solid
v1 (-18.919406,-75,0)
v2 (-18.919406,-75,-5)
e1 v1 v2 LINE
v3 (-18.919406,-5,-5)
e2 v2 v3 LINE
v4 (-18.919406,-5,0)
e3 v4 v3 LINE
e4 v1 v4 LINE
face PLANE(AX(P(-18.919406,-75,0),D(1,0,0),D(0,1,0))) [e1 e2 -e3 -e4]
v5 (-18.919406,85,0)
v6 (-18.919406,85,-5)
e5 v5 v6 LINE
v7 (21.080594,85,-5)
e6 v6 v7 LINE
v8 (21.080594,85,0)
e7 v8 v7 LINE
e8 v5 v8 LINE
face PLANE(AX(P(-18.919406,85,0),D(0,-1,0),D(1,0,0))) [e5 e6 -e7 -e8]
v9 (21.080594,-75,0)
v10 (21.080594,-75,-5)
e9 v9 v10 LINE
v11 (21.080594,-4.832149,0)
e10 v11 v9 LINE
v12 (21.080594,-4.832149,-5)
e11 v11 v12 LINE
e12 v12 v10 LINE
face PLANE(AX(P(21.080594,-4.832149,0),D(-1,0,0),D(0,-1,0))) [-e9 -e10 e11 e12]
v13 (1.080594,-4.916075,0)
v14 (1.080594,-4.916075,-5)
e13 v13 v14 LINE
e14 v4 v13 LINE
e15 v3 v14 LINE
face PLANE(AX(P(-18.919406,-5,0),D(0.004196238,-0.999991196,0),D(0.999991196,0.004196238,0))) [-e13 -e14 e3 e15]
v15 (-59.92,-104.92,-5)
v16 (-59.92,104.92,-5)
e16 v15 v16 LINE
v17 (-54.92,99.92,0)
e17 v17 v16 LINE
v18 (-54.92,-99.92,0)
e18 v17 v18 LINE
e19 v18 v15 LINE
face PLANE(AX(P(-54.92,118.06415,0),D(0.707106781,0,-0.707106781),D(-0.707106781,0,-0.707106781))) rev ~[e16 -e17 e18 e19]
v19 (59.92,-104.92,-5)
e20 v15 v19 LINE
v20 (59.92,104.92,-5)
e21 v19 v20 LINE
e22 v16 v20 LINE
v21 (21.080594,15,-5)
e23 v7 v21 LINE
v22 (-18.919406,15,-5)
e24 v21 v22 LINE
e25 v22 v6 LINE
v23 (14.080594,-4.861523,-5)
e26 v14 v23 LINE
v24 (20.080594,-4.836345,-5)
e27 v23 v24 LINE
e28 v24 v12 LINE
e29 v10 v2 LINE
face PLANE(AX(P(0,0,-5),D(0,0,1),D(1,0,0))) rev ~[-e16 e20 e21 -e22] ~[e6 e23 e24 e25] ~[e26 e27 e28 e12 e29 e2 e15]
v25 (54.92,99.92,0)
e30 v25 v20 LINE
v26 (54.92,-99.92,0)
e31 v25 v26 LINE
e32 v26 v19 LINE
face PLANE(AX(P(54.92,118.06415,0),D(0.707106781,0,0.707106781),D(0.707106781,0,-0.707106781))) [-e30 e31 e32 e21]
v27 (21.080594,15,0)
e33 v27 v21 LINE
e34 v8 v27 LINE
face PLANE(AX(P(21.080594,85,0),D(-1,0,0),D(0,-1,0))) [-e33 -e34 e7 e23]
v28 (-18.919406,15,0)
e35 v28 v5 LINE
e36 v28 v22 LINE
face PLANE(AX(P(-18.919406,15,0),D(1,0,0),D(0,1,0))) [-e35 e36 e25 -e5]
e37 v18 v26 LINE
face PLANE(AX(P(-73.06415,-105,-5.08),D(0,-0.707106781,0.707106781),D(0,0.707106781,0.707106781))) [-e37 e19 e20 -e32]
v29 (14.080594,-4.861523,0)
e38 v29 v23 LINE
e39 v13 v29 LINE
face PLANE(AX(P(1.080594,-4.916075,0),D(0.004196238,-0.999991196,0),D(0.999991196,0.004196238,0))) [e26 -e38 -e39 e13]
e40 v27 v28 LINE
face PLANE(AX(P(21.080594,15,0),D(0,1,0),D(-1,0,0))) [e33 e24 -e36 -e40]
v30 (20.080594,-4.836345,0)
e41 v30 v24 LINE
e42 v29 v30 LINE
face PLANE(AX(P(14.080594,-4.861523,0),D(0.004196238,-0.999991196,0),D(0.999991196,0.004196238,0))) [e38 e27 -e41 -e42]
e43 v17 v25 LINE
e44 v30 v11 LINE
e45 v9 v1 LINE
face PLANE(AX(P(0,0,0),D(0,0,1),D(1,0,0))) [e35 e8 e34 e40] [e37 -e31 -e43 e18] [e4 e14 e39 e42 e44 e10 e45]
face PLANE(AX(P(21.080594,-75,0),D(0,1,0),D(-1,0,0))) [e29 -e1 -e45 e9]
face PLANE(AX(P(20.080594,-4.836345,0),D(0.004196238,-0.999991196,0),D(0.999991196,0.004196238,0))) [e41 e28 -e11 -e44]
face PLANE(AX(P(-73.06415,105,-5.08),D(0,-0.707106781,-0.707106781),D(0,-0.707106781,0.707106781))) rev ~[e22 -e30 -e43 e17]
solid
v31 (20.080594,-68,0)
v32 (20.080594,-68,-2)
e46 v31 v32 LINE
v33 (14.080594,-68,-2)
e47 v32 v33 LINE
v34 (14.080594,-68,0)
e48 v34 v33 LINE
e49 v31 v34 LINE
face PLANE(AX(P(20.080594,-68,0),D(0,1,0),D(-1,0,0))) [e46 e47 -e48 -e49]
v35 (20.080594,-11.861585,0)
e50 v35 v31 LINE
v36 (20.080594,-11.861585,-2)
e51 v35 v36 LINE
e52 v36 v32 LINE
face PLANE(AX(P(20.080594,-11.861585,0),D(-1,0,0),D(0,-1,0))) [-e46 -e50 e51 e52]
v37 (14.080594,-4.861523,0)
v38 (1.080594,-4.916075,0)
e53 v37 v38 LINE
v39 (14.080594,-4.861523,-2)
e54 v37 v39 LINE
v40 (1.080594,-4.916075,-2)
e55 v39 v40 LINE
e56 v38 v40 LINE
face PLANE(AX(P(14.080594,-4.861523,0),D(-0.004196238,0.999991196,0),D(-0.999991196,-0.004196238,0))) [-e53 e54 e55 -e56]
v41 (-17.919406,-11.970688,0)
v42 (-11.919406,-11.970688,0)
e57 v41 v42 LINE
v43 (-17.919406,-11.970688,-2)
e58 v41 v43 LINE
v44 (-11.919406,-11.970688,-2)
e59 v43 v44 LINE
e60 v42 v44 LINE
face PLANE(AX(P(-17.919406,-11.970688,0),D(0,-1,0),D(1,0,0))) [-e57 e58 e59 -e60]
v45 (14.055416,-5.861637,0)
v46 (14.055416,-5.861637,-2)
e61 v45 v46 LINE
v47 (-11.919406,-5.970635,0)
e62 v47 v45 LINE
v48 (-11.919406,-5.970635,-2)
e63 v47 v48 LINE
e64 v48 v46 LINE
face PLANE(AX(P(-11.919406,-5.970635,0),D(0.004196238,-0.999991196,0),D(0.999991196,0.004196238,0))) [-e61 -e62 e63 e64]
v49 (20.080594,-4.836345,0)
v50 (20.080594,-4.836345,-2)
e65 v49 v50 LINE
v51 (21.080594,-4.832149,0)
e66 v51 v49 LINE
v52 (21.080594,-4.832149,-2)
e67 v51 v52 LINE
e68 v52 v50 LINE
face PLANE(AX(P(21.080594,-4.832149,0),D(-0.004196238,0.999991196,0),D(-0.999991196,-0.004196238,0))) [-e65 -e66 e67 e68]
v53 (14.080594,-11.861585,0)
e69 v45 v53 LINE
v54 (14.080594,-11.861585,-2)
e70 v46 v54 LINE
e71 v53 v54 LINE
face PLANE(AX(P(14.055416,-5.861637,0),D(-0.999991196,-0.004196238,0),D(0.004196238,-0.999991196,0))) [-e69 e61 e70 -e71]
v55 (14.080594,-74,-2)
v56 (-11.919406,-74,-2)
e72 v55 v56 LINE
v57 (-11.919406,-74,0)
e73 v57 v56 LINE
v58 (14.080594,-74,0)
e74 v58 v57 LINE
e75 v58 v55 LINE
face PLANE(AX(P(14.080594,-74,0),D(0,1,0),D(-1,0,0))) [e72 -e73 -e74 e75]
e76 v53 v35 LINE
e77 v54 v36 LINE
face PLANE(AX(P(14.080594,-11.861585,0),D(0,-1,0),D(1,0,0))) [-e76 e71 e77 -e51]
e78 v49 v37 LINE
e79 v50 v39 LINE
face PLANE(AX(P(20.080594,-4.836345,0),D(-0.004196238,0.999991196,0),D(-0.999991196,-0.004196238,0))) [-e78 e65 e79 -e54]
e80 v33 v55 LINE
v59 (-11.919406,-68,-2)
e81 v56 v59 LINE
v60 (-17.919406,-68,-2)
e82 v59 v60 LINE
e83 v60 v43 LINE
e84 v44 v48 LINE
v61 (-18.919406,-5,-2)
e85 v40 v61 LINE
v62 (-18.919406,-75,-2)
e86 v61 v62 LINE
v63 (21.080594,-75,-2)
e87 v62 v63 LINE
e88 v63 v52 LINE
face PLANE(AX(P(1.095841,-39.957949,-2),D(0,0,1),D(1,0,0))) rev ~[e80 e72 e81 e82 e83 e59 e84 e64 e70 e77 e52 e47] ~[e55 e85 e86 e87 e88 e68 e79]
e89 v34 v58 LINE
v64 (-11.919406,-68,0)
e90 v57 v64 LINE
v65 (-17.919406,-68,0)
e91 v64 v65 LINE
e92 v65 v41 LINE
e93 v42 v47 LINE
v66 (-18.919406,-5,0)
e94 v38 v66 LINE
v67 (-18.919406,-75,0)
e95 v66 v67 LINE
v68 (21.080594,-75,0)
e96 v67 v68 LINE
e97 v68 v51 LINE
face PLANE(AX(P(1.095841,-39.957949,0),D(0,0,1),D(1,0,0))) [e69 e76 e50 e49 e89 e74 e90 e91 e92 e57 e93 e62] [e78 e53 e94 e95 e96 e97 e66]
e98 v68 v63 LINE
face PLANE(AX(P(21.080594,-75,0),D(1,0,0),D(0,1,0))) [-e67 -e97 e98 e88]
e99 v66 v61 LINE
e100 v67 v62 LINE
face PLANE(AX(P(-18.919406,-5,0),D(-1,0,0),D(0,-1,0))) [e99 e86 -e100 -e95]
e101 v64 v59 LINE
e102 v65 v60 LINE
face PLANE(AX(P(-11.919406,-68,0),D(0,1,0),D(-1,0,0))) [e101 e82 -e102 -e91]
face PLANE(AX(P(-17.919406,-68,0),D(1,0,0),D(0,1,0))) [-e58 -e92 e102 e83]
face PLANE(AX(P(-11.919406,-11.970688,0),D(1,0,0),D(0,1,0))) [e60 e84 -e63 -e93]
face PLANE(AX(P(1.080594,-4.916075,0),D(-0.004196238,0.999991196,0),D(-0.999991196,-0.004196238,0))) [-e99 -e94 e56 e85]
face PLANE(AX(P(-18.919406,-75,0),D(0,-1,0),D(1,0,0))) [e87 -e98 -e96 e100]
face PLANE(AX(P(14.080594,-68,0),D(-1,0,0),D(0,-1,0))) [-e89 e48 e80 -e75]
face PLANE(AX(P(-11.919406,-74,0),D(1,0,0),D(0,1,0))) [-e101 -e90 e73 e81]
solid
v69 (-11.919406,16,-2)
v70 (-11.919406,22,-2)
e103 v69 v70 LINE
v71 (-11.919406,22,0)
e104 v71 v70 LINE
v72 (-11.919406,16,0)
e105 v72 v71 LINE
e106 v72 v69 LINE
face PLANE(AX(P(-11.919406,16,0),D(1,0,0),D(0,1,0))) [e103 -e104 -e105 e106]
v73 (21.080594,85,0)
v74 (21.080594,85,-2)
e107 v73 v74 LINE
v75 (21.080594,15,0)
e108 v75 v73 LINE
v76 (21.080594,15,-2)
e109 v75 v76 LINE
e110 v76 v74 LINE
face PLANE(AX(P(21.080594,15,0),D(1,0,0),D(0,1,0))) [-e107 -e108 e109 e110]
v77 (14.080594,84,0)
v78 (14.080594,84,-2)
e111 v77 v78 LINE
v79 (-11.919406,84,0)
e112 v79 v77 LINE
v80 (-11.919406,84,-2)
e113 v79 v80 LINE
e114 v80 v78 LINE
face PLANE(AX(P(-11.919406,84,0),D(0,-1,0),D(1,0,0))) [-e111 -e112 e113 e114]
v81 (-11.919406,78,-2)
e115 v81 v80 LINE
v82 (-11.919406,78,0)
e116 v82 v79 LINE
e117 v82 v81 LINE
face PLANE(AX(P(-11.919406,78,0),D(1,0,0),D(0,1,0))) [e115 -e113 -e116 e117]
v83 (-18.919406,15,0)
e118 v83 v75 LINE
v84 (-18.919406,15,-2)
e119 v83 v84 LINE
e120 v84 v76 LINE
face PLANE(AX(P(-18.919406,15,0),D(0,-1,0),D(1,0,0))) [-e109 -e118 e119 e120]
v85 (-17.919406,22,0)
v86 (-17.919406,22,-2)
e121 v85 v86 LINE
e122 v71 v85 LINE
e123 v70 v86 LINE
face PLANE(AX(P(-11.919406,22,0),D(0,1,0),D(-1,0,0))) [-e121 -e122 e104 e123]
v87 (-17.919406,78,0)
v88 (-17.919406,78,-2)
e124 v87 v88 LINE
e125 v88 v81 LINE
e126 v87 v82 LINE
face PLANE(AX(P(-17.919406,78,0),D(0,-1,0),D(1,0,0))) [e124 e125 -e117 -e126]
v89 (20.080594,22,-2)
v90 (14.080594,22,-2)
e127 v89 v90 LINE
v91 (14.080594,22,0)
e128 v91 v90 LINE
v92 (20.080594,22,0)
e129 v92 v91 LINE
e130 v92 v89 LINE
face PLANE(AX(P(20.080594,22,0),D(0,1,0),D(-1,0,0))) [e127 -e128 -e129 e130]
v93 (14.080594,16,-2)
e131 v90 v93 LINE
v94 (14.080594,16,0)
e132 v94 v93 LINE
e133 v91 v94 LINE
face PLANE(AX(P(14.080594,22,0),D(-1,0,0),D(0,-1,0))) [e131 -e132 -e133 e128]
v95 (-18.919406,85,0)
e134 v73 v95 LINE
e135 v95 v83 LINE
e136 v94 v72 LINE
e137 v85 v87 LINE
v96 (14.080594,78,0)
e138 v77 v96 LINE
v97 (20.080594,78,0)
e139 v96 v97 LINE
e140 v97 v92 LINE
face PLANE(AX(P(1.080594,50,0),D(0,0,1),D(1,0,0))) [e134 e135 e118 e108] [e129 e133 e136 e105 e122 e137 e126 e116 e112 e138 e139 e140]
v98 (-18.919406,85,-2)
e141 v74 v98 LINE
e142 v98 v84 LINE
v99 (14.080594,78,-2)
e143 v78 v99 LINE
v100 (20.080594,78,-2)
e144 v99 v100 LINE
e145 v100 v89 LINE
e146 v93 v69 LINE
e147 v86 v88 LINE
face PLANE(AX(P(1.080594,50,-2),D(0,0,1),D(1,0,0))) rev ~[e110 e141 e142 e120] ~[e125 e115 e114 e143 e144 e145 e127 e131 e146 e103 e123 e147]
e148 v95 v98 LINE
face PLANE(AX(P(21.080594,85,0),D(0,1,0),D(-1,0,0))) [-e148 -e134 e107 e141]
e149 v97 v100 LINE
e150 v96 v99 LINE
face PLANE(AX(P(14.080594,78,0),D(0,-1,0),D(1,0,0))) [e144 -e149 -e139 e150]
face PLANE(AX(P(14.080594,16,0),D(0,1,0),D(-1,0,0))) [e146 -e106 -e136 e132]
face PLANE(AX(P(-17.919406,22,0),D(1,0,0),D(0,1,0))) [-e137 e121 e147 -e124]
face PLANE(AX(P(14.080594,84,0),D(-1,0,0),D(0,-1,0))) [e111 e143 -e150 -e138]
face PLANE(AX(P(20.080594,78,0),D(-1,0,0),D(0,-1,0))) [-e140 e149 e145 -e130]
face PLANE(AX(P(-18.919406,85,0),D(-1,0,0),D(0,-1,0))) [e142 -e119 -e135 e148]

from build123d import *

# Parameters (mm, degrees)
F0_W        = 120
F0_H        = 210
F1_DEPTH    = 5
F2_DEPTH    = 2
F3_T1_DEPTH = 236.1282991577
F3_T3_DEPTH = 146.1282991577


# Not quite as in the source:
# - a fillet or chamfer that OpenCascade refuses, or shapes differently, is made with other operations: its cross-section is extruded or revolved along the edge and cut away or added


with BuildPart() as f1:
    # F0 (on Top) → F1 (new body)
    with BuildSketch(Plane.XY):
        Rectangle(F0_W, F0_H)
        Polygon((20.0805937573, -4.8363452922), (21.0805937573, -4.8321490176), (21.0805937573, -5.8321578219), (21.0805937573, -75), (-18.9194062427, -75), (-18.9194062427, -5), (1.0805937573, -4.9160745088), (14.0805937573, -4.8615229395), align=None, mode=Mode.SUBTRACT)
        Polygon((-18.9194062427, 22), (-18.9194062427, 52.2003881633), (-18.9194062427, 78), (-18.9194062427, 85), (-11.9194062427, 85), (14.0805937573, 85), (21.0805937573, 85), (21.0805937573, 78), (21.0805937573, 50.9695373476), (21.0805937573, 15), (14.0805937573, 15), (-11.9194062427, 15), (-18.9194062427, 15), align=None, mode=Mode.SUBTRACT)
    extrude(amount=-F1_DEPTH)

    # F3: chamfer of 5.08 on 4 edges, made by hand

    # F3_s2 → F3_t1 (cut)
    with BuildSketch(Plane.XZ.offset(-118.0641495789)):
        Polygon((-54.92, 0), (-60, -5.08), (-60, 0), align=None)
        Polygon((54.92, 0), (60, -5.08), (60, 0), align=None)
    extrude(amount=F3_T1_DEPTH, mode=Mode.SUBTRACT)

    # F3_s4 → F3_t3 (cut)
    with BuildSketch(Plane.YZ.offset(-73.0641495789)):
        Polygon((105, -5.08), (99.92, 0), (105, 0), align=None)
        Polygon((-105, -5.08), (-99.92, 0), (-105, 0), align=None)
    extrude(amount=F3_T3_DEPTH, mode=Mode.SUBTRACT)


with BuildPart() as f2:
    # F0 (on Top) → F2 (new body)
    with BuildSketch(Plane.XY):
        Polygon((21.0805937573, -5.8321578219), (21.0805937573, -4.8321490176), (20.0805937573, -4.8363452922), (14.0805937573, -4.8615229395), (1.0805937573, -4.9160745088), (-18.9194062427, -5), (-18.9194062427, -75), (21.0805937573, -75), align=None)
        Polygon((14.0554163316, -5.8616373952), (14.0805937573, -11.8615845698), (20.0805937573, -11.8615845698), (20.0805937573, -68), (14.0805937573, -68), (14.0805937573, -74), (-11.9194062427, -74), (-11.9194062427, -68), (-17.9194062427, -68), (-17.9194062427, -11.9706877083), (-11.9194062427, -11.9706877083), (-11.9194062427, -5.9706348824), align=None, mode=Mode.SUBTRACT)
    extrude(amount=-F2_DEPTH)


with BuildPart() as f2b:
    # F0 (on Top) → F2, piece 2 (new body)
    with BuildSketch(Plane.XY):
        Polygon((-18.9194062427, 78), (-18.9194062427, 52.2003881633), (-18.9194062427, 22), (-18.9194062427, 15), (-11.9194062427, 15), (14.0805937573, 15), (21.0805937573, 15), (21.0805937573, 50.9695373476), (21.0805937573, 78), (21.0805937573, 85), (14.0805937573, 85), (-11.9194062427, 85), (-18.9194062427, 85), align=None)
        Polygon((-17.9194062427, 22), (-17.9194062427, 78), (-11.9194062427, 78), (-11.9194062427, 84), (14.0805937573, 84), (14.0805937573, 78), (20.0805937573, 78), (20.0805937573, 22), (14.0805937573, 22), (14.0805937573, 16), (-11.9194062427, 16), (-11.9194062427, 22), align=None, mode=Mode.SUBTRACT)
    extrude(amount=-F2_DEPTH)


solid = Compound([f1.part, f2.part, f2b.part])
